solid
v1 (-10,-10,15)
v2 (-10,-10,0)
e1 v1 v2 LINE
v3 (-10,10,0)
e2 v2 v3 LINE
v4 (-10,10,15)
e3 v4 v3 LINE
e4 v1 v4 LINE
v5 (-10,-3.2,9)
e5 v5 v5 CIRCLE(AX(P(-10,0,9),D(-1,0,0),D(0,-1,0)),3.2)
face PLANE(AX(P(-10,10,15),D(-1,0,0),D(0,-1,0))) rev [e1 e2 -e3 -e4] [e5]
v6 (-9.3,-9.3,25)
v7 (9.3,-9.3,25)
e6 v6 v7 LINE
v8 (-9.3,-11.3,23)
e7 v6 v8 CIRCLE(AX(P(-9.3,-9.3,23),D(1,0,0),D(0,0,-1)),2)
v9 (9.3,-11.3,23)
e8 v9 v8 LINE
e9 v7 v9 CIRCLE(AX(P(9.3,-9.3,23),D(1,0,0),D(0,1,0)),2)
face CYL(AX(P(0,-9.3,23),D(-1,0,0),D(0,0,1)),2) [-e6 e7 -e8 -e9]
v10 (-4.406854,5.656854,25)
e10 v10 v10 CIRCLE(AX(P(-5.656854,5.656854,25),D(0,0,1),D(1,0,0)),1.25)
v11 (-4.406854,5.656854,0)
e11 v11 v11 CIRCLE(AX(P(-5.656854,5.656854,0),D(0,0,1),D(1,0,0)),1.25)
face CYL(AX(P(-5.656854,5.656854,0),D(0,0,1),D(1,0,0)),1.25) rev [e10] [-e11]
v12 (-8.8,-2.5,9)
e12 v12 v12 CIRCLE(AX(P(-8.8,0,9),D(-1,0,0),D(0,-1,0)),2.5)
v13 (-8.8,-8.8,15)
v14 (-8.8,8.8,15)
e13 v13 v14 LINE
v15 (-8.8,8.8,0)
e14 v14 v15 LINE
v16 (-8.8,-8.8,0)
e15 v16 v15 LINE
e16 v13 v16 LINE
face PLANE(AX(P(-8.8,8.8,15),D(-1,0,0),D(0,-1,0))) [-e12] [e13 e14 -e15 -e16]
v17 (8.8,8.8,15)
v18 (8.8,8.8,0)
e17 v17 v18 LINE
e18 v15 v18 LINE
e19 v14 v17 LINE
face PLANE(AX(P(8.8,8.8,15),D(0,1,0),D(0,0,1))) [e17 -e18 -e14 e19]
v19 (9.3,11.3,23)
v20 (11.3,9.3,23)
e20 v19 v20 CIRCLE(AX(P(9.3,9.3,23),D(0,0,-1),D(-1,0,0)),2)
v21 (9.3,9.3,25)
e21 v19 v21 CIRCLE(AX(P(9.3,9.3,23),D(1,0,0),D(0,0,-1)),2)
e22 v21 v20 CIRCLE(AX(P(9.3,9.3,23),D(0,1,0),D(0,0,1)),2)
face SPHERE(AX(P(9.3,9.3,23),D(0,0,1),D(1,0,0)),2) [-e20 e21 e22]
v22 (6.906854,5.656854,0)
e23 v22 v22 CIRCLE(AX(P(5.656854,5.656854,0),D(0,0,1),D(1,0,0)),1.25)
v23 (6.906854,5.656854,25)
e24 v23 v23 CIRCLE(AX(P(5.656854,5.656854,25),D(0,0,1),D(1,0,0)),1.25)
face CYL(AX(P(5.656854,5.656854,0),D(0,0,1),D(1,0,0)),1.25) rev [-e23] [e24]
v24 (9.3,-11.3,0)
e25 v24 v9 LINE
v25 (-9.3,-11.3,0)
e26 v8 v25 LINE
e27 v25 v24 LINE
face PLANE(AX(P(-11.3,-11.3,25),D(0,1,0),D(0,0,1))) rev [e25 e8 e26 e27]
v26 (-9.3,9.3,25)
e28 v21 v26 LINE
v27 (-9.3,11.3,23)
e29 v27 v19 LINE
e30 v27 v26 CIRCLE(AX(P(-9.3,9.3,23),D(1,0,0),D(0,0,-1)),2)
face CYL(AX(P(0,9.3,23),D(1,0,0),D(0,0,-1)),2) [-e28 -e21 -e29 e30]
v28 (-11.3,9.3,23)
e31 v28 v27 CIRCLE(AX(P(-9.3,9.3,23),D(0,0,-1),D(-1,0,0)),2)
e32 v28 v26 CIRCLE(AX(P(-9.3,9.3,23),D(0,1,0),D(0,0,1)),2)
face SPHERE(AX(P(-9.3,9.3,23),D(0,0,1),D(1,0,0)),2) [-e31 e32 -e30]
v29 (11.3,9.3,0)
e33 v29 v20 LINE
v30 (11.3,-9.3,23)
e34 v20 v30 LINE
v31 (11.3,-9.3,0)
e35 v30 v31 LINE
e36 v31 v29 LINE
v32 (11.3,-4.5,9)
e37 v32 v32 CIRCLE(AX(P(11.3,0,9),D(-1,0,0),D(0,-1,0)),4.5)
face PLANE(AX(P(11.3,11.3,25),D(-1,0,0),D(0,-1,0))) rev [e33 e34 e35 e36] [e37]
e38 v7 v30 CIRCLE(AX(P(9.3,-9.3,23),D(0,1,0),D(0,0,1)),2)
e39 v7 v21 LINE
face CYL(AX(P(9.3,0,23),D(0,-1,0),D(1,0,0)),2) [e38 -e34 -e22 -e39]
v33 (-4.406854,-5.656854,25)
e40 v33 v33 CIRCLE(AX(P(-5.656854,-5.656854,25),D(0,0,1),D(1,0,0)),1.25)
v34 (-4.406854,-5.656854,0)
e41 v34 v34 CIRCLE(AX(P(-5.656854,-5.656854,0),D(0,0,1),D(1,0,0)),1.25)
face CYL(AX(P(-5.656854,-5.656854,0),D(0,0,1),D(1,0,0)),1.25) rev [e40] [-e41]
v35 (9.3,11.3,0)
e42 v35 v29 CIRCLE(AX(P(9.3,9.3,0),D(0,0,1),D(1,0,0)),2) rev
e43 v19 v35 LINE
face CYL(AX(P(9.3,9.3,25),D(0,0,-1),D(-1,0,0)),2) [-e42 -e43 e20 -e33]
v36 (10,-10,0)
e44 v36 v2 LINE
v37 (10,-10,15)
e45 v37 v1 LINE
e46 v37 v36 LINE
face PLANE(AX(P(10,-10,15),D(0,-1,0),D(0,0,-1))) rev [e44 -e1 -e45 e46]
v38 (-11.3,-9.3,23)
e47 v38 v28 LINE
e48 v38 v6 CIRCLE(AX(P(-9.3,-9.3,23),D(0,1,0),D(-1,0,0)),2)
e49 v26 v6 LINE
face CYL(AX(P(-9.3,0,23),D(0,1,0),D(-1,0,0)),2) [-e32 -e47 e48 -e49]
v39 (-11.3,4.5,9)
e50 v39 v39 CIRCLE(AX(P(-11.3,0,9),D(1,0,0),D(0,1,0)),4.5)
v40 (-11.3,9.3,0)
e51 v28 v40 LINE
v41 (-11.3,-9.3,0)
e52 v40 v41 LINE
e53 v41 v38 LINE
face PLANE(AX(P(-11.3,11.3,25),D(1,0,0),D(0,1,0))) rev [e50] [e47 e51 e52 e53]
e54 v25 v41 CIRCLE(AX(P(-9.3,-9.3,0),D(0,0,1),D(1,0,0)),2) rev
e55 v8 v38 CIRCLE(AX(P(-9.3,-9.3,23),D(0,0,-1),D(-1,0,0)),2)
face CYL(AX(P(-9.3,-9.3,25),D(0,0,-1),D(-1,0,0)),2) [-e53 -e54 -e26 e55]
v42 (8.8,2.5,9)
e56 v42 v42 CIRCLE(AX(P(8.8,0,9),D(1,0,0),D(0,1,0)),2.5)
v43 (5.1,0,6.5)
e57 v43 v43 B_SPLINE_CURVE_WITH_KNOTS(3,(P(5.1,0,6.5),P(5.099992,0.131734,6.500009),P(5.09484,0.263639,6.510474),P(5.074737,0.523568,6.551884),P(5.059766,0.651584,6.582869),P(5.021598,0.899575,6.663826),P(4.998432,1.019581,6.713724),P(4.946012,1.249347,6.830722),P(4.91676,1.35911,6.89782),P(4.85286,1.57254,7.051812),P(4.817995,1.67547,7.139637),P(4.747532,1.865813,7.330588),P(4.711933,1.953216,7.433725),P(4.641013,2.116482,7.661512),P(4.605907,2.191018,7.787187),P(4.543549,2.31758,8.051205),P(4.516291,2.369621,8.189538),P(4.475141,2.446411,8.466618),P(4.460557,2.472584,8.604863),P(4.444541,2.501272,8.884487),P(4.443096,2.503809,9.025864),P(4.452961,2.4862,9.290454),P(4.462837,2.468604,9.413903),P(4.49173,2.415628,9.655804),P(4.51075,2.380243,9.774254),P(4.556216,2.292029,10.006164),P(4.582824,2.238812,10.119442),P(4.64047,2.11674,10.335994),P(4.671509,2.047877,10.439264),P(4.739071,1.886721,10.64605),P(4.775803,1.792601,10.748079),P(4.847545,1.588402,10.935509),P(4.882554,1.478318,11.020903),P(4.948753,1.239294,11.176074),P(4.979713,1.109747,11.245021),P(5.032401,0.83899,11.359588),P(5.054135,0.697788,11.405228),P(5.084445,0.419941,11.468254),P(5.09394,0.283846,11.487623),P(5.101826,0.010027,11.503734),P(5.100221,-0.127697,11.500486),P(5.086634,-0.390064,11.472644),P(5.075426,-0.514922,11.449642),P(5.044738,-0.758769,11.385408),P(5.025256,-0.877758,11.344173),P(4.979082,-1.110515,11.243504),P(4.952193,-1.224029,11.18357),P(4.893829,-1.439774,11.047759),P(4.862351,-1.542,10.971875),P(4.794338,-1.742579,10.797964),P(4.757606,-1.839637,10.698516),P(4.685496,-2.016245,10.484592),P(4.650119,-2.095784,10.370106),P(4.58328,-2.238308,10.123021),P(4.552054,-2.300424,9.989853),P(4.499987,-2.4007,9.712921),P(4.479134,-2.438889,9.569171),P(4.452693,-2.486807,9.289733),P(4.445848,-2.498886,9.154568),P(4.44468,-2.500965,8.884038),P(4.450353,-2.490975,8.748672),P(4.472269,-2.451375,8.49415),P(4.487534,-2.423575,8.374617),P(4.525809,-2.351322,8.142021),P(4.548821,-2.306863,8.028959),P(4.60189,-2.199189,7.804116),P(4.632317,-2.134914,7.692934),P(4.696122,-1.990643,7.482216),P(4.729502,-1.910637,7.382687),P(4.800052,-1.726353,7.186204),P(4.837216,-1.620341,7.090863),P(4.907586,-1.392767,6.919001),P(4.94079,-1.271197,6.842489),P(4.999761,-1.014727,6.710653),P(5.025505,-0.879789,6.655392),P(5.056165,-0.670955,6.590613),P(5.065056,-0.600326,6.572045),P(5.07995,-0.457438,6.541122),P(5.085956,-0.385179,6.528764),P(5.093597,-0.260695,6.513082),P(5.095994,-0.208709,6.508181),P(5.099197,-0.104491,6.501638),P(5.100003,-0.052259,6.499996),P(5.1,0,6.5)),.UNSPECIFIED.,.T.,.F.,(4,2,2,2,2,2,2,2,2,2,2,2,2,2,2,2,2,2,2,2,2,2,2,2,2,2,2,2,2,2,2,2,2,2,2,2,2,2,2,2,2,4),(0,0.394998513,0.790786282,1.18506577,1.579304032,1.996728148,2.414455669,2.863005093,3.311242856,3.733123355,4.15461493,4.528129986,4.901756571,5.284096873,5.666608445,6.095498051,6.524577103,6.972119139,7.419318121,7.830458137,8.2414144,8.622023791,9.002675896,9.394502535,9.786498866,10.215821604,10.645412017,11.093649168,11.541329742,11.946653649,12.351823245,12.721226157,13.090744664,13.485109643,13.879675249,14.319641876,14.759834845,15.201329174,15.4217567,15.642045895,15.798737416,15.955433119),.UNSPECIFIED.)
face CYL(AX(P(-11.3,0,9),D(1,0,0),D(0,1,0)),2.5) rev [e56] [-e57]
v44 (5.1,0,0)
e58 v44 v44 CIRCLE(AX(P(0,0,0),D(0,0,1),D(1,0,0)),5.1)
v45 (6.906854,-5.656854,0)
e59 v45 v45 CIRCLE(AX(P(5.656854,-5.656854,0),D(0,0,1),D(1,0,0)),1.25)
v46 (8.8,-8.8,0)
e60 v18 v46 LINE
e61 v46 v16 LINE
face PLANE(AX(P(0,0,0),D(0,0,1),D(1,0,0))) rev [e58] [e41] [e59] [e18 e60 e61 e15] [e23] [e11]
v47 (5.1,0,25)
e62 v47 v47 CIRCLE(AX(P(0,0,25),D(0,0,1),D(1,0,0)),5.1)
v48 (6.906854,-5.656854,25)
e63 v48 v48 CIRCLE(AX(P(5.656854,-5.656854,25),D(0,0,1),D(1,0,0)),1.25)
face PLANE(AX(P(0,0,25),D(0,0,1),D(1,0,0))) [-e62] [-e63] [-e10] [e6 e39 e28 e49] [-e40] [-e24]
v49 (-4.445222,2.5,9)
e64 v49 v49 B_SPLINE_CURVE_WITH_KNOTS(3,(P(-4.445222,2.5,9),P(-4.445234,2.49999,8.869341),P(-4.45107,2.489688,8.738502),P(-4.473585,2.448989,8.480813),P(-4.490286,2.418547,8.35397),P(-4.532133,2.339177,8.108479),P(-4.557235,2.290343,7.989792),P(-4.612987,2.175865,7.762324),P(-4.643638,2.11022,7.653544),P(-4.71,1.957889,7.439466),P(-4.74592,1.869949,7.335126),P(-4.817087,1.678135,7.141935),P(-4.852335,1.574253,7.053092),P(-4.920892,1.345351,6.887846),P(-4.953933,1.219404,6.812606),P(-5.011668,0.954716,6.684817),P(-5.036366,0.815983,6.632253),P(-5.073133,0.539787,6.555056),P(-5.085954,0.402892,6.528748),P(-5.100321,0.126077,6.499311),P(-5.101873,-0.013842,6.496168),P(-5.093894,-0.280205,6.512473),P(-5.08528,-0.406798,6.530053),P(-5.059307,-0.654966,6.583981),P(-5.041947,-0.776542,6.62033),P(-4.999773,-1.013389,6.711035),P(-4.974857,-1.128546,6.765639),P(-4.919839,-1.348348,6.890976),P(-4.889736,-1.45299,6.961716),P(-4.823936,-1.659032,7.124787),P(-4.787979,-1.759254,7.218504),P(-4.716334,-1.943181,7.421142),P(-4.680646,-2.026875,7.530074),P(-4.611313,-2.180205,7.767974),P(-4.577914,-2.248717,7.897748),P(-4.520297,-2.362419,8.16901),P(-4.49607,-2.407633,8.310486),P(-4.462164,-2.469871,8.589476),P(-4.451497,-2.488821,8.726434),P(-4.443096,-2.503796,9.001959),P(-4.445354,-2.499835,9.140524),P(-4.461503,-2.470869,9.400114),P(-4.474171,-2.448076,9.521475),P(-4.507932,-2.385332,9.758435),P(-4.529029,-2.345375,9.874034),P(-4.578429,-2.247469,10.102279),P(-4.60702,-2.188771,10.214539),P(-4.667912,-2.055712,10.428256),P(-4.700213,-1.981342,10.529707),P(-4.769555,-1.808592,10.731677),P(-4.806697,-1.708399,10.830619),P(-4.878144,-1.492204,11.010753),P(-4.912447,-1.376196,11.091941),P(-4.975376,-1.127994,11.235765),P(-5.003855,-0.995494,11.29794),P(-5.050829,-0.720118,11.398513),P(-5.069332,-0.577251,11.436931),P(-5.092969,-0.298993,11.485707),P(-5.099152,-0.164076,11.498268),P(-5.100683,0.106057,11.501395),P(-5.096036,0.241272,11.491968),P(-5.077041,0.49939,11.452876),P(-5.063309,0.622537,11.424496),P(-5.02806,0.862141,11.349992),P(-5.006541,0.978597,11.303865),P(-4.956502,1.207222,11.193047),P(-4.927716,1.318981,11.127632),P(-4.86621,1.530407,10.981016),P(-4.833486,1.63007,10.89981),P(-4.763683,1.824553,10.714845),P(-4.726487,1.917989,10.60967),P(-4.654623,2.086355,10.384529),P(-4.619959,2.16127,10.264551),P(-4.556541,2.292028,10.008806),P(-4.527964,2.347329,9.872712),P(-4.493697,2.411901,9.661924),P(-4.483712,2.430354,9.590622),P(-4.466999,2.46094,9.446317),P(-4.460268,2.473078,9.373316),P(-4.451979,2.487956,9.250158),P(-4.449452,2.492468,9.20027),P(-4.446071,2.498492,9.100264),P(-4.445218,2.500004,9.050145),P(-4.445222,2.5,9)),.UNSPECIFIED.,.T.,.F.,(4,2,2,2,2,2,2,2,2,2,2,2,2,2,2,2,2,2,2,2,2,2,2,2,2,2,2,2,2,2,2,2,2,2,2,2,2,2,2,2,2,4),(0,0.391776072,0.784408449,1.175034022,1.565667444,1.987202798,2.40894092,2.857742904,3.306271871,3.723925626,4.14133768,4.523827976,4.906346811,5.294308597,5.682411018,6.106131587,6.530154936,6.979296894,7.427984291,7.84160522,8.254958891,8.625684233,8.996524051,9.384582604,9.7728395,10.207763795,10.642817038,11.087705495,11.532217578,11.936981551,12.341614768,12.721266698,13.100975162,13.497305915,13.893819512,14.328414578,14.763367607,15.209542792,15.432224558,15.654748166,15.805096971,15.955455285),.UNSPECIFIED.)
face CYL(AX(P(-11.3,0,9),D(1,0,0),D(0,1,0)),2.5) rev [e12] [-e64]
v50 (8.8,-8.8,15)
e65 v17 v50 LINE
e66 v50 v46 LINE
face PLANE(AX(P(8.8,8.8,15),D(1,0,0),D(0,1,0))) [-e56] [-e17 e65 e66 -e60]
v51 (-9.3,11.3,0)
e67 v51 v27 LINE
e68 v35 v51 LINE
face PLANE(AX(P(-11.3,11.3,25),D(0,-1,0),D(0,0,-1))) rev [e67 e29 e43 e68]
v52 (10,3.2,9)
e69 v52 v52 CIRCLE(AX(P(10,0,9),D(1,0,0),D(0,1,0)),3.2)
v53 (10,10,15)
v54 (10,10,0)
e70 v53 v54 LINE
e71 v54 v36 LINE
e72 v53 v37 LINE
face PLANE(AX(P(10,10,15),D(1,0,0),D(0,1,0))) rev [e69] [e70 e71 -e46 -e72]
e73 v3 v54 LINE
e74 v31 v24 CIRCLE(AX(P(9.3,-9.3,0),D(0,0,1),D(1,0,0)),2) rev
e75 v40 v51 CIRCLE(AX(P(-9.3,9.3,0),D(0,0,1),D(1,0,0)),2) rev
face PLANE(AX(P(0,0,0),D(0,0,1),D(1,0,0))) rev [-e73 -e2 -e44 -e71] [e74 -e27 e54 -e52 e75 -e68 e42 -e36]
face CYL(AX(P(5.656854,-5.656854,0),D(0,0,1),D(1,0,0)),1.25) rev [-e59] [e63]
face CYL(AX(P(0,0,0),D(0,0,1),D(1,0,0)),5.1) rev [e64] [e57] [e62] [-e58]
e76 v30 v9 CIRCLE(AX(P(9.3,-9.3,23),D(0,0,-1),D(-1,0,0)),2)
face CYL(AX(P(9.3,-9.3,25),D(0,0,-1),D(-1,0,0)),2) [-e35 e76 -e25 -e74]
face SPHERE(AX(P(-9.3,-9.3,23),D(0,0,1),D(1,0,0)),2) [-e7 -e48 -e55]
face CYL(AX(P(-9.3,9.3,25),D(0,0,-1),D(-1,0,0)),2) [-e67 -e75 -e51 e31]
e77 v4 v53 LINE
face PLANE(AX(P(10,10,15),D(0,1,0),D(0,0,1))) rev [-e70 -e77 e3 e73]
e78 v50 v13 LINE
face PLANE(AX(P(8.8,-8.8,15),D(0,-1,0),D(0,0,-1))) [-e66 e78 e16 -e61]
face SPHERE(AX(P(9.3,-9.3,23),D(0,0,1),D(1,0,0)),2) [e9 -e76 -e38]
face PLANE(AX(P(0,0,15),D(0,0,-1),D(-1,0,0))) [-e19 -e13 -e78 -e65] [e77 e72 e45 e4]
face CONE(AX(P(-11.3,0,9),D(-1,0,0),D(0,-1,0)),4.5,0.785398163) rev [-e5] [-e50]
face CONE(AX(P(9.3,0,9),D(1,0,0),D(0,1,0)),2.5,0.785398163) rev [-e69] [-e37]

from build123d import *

# Parameters (mm, degrees)
CROQUIS1_W              = 22.6
CROQUIS1_H              = 22.6
SALIENTE_EXTRUIR1_DEPTH = 25
CROQUIS2_R              = 5.1
CORTAR_EXTRUIR1_DEPTH   = 30.671198156
CROQUIS3_R              = 1.25
CORTAR_EXTRUIR2_DEPTH   = 30.671198156
CROQUIS4_W              = 20
CROQUIS4_H              = 20
CROQUIS4_W_2            = 17.6
CROQUIS4_H_2            = 17.6
CORTAR_EXTRUIR3_DEPTH   = 15
CROQUIS5_R              = 2.5
CORTAR_EXTRUIR4_DEPTH   = 36.545041848
CHAFL_N1_SIZE           = 2
REDONDEO1_R             = 2
REDONDEO2_R             = 2


with BuildPart() as part:
    # Croquis1 → Saliente-Extruir1 (new body)
    with BuildSketch(Plane.XY):
        Rectangle(CROQUIS1_W, CROQUIS1_H)
    extrude(amount=SALIENTE_EXTRUIR1_DEPTH)

    # Croquis2 → Cortar-Extruir1 (cut, through all)
    with BuildSketch(Plane.XY.offset(25)):
        Circle(CROQUIS2_R)
    extrude(amount=-CORTAR_EXTRUIR1_DEPTH, mode=Mode.SUBTRACT)

    # Croquis3 → Cortar-Extruir2 (cut, through all)
    with BuildSketch(Plane.XY.offset(25)):
        with Locations((5.656854249, 5.656854249)):
            Circle(CROQUIS3_R)
        with Locations((5.656854249, -5.656854249)):
            Circle(CROQUIS3_R)
        with Locations((-5.656854249, -5.656854249)):
            Circle(CROQUIS3_R)
        with Locations((-5.656854249, 5.656854249)):
            Circle(CROQUIS3_R)
    extrude(amount=-CORTAR_EXTRUIR2_DEPTH, mode=Mode.SUBTRACT)

    # Croquis4 → Cortar-Extruir3 (cut)
    with BuildSketch(Plane(origin=(0, 0, 0), x_dir=(-1, 0, 0), z_dir=(0, 0, -1))):
        Rectangle(CROQUIS4_W, CROQUIS4_H)
        Rectangle(CROQUIS4_W_2, CROQUIS4_H_2, mode=Mode.SUBTRACT)
    extrude(amount=-CORTAR_EXTRUIR3_DEPTH, mode=Mode.SUBTRACT)

    # Croquis5 → Cortar-Extruir4 (cut, through all)
    with BuildSketch(Plane(origin=(11.3, 0, 0), x_dir=(0, 0, -1), z_dir=(1, 0, 0))):
        with Locations(Location((-9, 0, 0), (0, 0, 90))):
            Circle(CROQUIS5_R)
    extrude(amount=-CORTAR_EXTRUIR4_DEPTH, mode=Mode.SUBTRACT)

    # Chaflán1
    # the kernel refuses this chamfer: 2 mm, written as the material it takes off along each edge
    with BuildSketch(Plane(origin=(-11.3, 0, 9), x_dir=(0, 1, 0), z_dir=(0, 0, -1))) as chafl_n1_piece_1:
        Polygon((2.5 + CHAFL_N1_SIZE, 0), (2.5, CHAFL_N1_SIZE), (2.5, 0), align=None)
    revolve(axis=Axis((-11.3, 0, 9), (1, 0, 0)), mode=Mode.SUBTRACT)
    with BuildSketch(Plane(origin=(11.3, 0, 9), x_dir=(0, 1, 0), z_dir=(0, 0, -1))) as chafl_n1_piece_2:
        Polygon((2.5 + CHAFL_N1_SIZE, 0), (2.5, -CHAFL_N1_SIZE), (2.5, 0), align=None)
    revolve(axis=Axis((11.3, 0, 9), (1, 0, 0)), mode=Mode.SUBTRACT)

    # Redondeo1
    redondeo1_edges = [part.edges().sort_by_distance(p)[0] for p in [
        (11.3, -11.3, 12.5),
        (-11.3, -11.3, 12.5),
        (-11.3, 11.3, 12.5),
        (11.3, 11.3, 12.5),
    ]]
    fillet(redondeo1_edges, radius=REDONDEO1_R)

    # Redondeo2
    redondeo2_edges = [part.edges().sort_by_distance(p)[0] for p in [
        (0, -11.3, 25),
        (-11.3, 0, 25),
        (11.3, 0, 25),
        (0, 11.3, 25),
        (10.714213562, 10.714213562, 25),
        (-10.714213562, 10.714213562, 25),
        (10.714213562, -10.714213562, 25),
        (-10.714213562, -10.714213562, 25),
    ]]
    fillet(redondeo2_edges, radius=REDONDEO2_R)


solid = part.part
